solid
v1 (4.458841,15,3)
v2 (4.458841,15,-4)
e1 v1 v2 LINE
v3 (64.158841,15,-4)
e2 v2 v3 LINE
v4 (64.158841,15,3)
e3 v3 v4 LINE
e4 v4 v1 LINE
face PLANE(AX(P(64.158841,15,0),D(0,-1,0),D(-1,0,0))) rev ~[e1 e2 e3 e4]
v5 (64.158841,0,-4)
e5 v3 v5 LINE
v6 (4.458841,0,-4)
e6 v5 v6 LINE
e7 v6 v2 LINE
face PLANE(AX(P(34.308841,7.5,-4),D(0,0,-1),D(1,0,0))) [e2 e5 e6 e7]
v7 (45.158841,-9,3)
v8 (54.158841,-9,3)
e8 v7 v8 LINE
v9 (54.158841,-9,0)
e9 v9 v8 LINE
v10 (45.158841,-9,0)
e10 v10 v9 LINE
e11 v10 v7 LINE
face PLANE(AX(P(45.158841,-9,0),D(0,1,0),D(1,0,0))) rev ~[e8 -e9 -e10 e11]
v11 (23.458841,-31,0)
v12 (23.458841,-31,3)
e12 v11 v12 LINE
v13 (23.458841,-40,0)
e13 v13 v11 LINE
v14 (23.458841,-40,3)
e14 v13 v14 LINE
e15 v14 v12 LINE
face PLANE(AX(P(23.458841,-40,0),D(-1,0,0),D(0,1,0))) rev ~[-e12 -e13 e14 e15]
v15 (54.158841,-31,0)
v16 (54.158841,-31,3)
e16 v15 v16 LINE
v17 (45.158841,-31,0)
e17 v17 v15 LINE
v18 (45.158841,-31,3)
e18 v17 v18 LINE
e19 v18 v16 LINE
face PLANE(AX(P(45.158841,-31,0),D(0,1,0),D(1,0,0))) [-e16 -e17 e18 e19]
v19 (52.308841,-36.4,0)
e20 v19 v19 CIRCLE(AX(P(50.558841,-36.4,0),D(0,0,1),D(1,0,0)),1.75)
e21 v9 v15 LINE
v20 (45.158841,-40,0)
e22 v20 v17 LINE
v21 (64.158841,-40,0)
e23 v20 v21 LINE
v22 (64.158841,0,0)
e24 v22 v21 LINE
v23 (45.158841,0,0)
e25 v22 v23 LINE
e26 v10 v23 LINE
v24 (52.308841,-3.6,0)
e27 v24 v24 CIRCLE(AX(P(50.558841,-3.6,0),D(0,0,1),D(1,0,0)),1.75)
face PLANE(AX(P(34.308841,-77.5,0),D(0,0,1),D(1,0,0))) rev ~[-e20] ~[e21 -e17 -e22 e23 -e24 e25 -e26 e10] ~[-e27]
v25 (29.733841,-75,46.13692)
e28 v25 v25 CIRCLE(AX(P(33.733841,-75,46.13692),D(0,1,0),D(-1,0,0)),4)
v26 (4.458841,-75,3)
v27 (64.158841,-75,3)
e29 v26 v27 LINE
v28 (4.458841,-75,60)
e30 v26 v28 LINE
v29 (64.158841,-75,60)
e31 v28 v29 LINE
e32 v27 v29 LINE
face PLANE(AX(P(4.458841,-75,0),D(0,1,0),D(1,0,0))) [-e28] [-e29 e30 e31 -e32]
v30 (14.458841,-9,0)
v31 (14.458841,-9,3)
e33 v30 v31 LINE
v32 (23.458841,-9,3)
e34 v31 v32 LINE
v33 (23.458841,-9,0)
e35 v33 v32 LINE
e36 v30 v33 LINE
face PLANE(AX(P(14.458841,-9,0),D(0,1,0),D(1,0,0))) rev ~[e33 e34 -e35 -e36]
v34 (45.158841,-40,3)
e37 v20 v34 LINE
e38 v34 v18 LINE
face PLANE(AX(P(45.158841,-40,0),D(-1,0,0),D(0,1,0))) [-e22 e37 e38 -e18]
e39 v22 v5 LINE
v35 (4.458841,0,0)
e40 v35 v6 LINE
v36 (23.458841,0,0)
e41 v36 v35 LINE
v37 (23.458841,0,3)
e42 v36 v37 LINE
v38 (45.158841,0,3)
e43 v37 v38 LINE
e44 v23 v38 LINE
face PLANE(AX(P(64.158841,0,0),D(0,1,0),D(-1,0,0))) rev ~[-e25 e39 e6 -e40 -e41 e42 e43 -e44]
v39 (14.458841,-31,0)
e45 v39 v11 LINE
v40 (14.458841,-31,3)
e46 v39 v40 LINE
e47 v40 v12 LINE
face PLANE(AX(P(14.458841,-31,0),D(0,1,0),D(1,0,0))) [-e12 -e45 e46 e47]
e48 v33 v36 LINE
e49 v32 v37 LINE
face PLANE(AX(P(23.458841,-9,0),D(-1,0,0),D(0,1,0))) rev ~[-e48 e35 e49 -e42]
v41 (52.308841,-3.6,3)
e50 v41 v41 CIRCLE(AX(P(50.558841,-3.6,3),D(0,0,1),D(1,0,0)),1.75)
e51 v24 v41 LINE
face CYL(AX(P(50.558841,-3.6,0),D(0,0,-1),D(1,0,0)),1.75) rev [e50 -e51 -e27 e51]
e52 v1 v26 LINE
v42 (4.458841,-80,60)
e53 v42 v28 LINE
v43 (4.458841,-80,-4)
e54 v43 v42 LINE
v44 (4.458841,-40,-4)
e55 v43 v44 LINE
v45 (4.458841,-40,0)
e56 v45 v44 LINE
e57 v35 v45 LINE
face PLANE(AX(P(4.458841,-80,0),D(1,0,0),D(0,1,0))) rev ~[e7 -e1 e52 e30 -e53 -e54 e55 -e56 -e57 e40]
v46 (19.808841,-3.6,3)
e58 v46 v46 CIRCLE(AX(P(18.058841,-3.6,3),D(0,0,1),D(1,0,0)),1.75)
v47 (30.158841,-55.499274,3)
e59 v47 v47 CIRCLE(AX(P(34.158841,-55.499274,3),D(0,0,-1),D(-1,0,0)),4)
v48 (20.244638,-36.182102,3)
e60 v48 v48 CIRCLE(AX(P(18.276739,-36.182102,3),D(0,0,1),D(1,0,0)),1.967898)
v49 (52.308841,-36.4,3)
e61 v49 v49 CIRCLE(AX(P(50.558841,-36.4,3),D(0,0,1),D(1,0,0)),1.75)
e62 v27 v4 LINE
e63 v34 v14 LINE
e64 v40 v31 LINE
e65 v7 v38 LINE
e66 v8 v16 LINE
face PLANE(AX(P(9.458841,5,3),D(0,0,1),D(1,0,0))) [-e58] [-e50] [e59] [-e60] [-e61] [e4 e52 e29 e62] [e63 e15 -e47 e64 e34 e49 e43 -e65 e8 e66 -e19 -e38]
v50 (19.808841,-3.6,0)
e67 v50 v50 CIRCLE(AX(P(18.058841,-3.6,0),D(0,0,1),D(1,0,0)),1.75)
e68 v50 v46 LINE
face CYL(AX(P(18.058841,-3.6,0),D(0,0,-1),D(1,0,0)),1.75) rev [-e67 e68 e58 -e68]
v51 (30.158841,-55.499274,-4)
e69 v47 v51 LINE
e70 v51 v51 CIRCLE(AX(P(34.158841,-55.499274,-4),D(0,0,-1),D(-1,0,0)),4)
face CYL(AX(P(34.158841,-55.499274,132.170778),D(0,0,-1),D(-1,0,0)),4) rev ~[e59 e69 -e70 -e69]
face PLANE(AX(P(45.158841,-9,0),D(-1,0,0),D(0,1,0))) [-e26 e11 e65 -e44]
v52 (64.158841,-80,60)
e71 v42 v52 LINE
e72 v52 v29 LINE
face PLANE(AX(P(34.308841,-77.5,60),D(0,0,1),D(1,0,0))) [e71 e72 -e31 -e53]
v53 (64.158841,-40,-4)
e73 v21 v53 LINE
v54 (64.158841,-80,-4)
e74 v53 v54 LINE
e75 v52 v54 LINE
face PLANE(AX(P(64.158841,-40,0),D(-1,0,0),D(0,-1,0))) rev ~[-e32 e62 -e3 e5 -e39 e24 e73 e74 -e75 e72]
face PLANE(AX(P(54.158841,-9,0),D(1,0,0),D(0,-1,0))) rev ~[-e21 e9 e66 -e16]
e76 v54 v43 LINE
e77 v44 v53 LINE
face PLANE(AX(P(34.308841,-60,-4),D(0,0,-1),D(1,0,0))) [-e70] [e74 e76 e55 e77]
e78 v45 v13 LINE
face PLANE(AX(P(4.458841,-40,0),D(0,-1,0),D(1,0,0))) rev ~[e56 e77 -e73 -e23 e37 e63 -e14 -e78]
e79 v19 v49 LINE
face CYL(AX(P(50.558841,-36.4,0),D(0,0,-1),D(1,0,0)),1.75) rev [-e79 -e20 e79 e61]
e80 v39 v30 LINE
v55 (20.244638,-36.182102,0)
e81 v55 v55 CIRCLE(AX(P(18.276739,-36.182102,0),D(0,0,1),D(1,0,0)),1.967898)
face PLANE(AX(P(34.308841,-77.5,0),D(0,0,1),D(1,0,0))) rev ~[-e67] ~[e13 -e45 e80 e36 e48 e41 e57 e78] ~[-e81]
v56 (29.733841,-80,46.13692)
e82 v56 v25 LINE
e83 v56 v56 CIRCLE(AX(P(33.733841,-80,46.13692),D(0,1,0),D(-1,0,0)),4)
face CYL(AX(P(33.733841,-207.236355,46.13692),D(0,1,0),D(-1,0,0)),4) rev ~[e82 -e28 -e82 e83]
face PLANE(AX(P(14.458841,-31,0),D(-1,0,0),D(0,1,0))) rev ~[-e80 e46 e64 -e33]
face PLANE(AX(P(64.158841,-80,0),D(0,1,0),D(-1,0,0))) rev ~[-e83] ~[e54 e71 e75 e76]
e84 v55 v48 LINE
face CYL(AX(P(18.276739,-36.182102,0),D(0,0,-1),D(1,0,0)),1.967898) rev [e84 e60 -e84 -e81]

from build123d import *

# Parameters (mm, degrees)
F0_W     = 10
F0_H     = 10
F0_W_2   = 9
F0_H_2   = 9
F0_R     = 1.75
F0_R_2   = 1.9678984668
F1_DEPTH = 3
F0_W_3   = 59.7
F0_H_3   = 5
F2_DEPTH = 60
F4_D     = 8
F6_DEPTH = 4
F8_D     = 8


# Not quite as in the source:
# - a feature names something its author has since deleted; it is built from what else it names


with BuildPart() as f1:
    # F0 (on Top) → F1 (new body)
    with BuildSketch(Plane.XY):
        with Locations((9.4588409364, 5)):
            Rectangle(F0_W, F0_H)
        with Locations((59.1588409364, 5)):
            Rectangle(F0_W, F0_H)
        Polygon((14.4588409364, 10), (14.4588409364, 0), (23.4588409364, 0), (45.1588409364, 0), (54.1588409364, 0), (54.1588409364, 10), align=None)
        Polygon((14.4588409364, -9), (14.4588409364, 0), (4.4588409364, 0), (4.4588409364, -40), (14.4588409364, -40), (14.4588409364, -31), align=None)
        Polygon((64.1588409364, 0), (54.1588409364, 0), (54.1588409364, -9), (54.1588409364, -31), (54.1588409364, -40), (64.1588409364, -40), align=None)
        Polygon((14.4588409364, -40), (4.4588409364, -40), (4.4588409364, -50), (4.4588409364, -75), (64.1588409364, -75), (64.1588409364, -50), (64.1588409364, -40), (54.1588409364, -40), (45.1588409364, -40), (23.4588409364, -40), align=None)
        with Locations((18.9588409364, -4.5)):
            Rectangle(F0_W_2, F0_H_2)
        with Locations((18.0588409364, -3.6)):
            Circle(F0_R, mode=Mode.SUBTRACT)
        with Locations((49.6588409364, -4.5)):
            Rectangle(F0_W_2, F0_H_2)
        with Locations((50.5588409364, -3.6)):
            Circle(F0_R, mode=Mode.SUBTRACT)
        with Locations((18.9588409364, -35.5)):
            Rectangle(F0_W_2, F0_H_2)
        with Locations((18.2767394032, -36.1821015332)):
            Circle(F0_R_2, mode=Mode.SUBTRACT)
        with Locations((49.6588409364, -35.5)):
            Rectangle(F0_W_2, F0_H_2)
        with Locations((50.5588409364, -36.4)):
            Circle(F0_R, mode=Mode.SUBTRACT)
        Polygon((4.4588409364, 10), (14.4588409364, 10), (54.1588409364, 10), (64.1588409364, 10), (64.1588409364, 15), (4.4588409364, 15), align=None)
    extrude(amount=F1_DEPTH)

    # F0 (on Top) → F2 (join)
    with BuildSketch(Plane.XY):
        with Locations((34.3088409364, -77.5)):
            Rectangle(F0_W_3, F0_H_3)
    extrude(amount=F2_DEPTH)

    # F4 (through all)
    with Locations(Plane.XZ.offset(80)):
        with Locations((33.7338409364, 46.1369195342)):
            Hole(F4_D / 2)

    # F5 (on face) → F6 (join)
    with BuildSketch(Plane(origin=(0, 0, 0), x_dir=(1, 0, 0), z_dir=(0, 0, -1))):
        Polygon((4.4588409364, 40), (23.4588409364, 40), (45.1588409364, 40), (64.1588409364, 40), (64.1588409364, 80), (4.4588409364, 80), align=None)
        Polygon((23.4588409364, 0), (4.4588409364, 0), (4.4588409364, -10), (4.4588409364, -15), (64.1588409364, -15), (64.1588409364, -10), (64.1588409364, 0), (45.1588409364, 0), align=None)
    extrude(amount=F6_DEPTH)

    # F8 (through all)
    with Locations(Plane.XY.offset(3)):
        with Locations((34.1588409364, -55.4992741766)):
            Hole(F8_D / 2)


solid = f1.part
